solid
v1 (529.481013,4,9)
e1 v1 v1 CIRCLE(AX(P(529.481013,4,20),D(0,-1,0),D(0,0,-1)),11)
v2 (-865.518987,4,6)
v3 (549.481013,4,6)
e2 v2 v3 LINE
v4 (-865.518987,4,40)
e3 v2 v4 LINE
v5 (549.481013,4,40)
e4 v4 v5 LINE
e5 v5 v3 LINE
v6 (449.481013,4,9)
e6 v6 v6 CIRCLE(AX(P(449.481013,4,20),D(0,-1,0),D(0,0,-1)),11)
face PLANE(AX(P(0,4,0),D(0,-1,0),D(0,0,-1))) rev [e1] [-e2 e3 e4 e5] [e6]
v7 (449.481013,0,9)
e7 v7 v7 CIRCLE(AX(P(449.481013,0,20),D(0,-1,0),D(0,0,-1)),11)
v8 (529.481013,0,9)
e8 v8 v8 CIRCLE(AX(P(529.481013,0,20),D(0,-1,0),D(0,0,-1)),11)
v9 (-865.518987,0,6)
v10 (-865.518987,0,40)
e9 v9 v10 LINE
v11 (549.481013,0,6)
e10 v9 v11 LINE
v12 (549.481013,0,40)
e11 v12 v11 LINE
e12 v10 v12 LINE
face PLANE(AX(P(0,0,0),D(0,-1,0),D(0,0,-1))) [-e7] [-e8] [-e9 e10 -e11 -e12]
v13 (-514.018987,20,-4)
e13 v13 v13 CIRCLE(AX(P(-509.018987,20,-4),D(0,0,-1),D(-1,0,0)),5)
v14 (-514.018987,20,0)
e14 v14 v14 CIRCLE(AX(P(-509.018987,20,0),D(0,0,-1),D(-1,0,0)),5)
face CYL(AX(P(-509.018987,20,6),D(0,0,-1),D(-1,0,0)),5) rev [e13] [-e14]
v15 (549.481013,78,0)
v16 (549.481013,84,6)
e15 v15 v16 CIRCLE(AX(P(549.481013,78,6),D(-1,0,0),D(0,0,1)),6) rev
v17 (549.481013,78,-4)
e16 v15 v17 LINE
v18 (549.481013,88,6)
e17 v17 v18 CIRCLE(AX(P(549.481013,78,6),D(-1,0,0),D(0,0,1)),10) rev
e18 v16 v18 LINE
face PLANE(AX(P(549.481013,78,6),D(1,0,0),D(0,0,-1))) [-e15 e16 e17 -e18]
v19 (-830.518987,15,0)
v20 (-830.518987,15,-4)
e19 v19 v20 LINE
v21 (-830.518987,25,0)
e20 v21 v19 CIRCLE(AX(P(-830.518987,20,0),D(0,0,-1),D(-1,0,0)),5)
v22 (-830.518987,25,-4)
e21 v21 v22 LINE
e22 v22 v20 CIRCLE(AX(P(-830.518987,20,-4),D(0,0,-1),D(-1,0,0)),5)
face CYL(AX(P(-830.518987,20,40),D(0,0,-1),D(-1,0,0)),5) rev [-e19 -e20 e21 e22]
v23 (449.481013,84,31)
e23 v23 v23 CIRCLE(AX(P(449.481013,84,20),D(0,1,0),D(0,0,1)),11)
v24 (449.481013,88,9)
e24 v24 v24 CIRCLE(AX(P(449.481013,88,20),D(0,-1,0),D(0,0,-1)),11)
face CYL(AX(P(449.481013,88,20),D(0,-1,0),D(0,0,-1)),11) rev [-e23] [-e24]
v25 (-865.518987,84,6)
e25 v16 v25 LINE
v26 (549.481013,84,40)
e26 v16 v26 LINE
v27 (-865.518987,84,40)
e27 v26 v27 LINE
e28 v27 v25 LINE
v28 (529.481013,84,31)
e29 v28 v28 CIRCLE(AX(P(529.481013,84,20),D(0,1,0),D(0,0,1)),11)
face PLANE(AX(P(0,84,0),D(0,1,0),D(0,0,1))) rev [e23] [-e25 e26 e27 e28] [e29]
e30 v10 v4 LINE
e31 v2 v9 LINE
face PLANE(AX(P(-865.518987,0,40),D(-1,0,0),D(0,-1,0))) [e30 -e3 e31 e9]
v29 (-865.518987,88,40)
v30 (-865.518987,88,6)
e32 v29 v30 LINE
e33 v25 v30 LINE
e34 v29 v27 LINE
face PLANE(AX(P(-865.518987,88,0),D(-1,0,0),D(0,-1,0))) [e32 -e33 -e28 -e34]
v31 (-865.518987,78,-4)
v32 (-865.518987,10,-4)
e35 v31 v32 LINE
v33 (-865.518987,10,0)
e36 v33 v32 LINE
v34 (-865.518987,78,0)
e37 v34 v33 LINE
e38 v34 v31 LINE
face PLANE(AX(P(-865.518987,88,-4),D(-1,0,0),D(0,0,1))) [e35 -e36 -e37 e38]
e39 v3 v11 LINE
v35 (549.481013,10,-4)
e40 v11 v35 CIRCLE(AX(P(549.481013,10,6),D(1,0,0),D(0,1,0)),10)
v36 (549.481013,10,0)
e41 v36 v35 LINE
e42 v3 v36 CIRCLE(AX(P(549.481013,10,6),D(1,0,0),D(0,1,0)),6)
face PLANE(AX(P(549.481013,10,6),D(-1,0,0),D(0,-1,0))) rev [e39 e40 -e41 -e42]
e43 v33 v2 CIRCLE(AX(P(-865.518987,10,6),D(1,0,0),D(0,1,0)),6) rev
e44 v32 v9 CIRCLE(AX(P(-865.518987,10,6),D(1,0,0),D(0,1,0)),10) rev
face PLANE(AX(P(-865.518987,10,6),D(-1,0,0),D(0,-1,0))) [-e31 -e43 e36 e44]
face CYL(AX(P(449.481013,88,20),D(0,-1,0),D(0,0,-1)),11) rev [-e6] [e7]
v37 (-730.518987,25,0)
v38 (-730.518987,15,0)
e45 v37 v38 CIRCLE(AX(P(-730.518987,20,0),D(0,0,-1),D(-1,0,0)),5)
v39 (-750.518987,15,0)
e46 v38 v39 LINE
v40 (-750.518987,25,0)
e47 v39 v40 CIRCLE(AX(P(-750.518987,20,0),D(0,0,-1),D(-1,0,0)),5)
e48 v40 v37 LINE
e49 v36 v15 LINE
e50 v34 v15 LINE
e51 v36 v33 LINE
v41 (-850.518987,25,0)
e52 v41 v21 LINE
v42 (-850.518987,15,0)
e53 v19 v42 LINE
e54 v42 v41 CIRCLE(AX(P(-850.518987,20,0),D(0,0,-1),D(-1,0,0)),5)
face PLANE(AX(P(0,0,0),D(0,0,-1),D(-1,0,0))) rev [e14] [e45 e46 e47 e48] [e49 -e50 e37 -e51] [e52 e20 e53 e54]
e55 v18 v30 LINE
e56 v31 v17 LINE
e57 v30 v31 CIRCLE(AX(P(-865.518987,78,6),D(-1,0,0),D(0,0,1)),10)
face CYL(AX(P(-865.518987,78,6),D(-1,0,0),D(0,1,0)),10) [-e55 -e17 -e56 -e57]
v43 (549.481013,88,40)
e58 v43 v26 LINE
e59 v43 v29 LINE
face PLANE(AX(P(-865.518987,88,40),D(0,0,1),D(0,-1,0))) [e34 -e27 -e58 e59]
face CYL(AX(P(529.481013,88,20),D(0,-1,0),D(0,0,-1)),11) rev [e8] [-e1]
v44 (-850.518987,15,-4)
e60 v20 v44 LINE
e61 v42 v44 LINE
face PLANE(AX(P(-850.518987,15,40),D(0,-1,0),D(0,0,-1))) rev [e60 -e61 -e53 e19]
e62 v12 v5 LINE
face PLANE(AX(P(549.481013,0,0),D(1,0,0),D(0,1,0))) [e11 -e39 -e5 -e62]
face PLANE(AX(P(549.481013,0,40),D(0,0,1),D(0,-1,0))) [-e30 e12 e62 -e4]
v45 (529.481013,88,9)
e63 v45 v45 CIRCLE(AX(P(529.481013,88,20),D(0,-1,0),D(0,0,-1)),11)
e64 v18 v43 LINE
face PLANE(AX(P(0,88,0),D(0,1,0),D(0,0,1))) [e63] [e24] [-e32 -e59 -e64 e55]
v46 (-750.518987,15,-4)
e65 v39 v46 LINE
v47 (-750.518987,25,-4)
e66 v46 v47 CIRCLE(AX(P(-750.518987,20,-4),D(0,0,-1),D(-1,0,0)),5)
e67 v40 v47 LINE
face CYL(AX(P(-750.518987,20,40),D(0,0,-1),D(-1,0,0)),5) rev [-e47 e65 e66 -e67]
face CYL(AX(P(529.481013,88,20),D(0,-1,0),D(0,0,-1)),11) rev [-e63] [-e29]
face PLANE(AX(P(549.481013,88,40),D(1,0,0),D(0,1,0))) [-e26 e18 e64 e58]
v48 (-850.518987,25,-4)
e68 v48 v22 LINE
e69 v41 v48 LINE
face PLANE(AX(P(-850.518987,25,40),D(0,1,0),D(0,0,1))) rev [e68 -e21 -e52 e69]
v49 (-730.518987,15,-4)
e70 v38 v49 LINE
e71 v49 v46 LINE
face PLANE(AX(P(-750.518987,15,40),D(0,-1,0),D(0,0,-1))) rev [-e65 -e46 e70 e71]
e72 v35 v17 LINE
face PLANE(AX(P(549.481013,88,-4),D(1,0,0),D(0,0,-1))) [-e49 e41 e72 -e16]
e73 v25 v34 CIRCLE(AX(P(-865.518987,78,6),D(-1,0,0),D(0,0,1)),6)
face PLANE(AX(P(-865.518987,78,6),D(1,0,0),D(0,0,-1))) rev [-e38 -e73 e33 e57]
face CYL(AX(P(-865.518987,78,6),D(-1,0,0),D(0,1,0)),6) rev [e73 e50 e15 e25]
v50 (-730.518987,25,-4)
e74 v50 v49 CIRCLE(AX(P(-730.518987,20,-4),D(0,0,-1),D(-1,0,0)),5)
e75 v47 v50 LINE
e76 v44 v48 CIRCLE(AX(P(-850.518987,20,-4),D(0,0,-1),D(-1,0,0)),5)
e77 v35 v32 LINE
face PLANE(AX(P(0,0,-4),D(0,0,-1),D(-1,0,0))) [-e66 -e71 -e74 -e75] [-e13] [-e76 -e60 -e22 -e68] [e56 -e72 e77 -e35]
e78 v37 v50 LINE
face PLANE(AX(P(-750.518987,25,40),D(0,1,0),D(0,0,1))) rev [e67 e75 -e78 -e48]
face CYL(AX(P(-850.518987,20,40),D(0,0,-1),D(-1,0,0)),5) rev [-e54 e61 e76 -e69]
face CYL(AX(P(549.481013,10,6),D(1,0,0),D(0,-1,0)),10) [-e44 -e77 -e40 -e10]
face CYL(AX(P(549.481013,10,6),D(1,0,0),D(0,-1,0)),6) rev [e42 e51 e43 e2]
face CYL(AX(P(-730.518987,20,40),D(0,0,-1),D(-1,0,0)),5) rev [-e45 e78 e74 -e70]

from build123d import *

# Parameters (mm, degrees)
SKETCH1_W                    = 1415
SKETCH1_H                    = 88
BASE_FLANGE1_DEPTH           = 4
EDGE_FLANGE1_STRIP_W         = 28
EDGE_FLANGE1_STRIP_H         = 4
EDGE_FLANGE1_STRIP_CUT_DEPTH = 1415
EDGE_FLANGE1_DEPTH           = 1415
EDGE_FLANGE2_STRIP_W         = 28
EDGE_FLANGE2_STRIP_H         = 4
EDGE_FLANGE2_STRIP_CUT_DEPTH = 1415
EDGE_FLANGE2_DEPTH           = 1415
CUT_EXTRUDE1_DEPTH           = 871.900176512
CUT_EXTRUDE1_DEPTH_BACK      = 871.900176512
SKETCH12_R                   = 11
CUT_EXTRUDE2_DEPTH           = 872.093059006
SKETCH16_R                   = 5
CUT_EXTRUDE4_DEPTH           = 10


# Sheet-metal steps are written as plain solids
with BuildPart() as part:
    # Sketch1 → Base-Flange1 (new body)
    with BuildSketch(Plane.XY):
        with Locations((-158.018987342, 44)):
            Rectangle(SKETCH1_W, SKETCH1_H)
    extrude(amount=-BASE_FLANGE1_DEPTH)

    # Edge-Flange1 strip (across the edge) → Edge-Flange1 strip cut (cut)
    with BuildSketch(Plane(origin=(549.481012658, 88, 0), x_dir=(0, -1, 0), z_dir=(-1, 0, 0))):
        with Locations((-4, -2)):
            Rectangle(EDGE_FLANGE1_STRIP_W, EDGE_FLANGE1_STRIP_H)
    extrude(amount=EDGE_FLANGE1_STRIP_CUT_DEPTH, mode=Mode.SUBTRACT)

    # Edge-Flange1 section (across the edge) → Edge-Flange1 (add)
    with BuildSketch(Plane(origin=(549.481012658, 88, 0), x_dir=(0, -1, 0), z_dir=(-1, 0, 0))):
        with BuildLine():
            Line((0, 6), (0, 40))
            Line((0, 40), (4, 40))
            Line((4, 40), (4, 6))
            ThreePointArc((4, 6), (5.757359313, 1.757359313), (10, 0))
            Line((10, 0), (10, -4))
            ThreePointArc((10, -4), (2.928932188, -1.071067812), (0, 6))
        make_face()
    extrude(amount=EDGE_FLANGE1_DEPTH)

    # Edge-Flange2 strip (across the edge) → Edge-Flange2 strip cut (cut)
    with BuildSketch(Plane.YZ.offset(-865.518987342)):
        with Locations((-4, -2)):
            Rectangle(EDGE_FLANGE2_STRIP_W, EDGE_FLANGE2_STRIP_H)
    extrude(amount=EDGE_FLANGE2_STRIP_CUT_DEPTH, mode=Mode.SUBTRACT)

    # Edge-Flange2 section (across the edge) → Edge-Flange2 (add)
    with BuildSketch(Plane.YZ.offset(-865.518987342)):
        with BuildLine():
            Line((0, 6), (0, 40))
            Line((0, 40), (4, 40))
            Line((4, 40), (4, 6))
            ThreePointArc((4, 6), (5.757359313, 1.757359313), (10, 0))
            Line((10, 0), (10, -4))
            ThreePointArc((10, -4), (2.928932188, -1.071067812), (0, 6))
        make_face()
    extrude(amount=EDGE_FLANGE2_DEPTH)

    # Sketch12 → Cut-Extrude1 (cut, two sides: drawn at the far end of the back side and taken through both)
    with BuildSketch(Plane.XZ.offset(-CUT_EXTRUDE1_DEPTH_BACK)):
        with Locations(Location((529.481012658, 20, 0), (0, 0, 270))):
            Circle(SKETCH12_R)
        with Locations(Location((449.481012658, 20, 0), (0, 0, 270))):
            Circle(SKETCH12_R)
    extrude(amount=CUT_EXTRUDE1_DEPTH + CUT_EXTRUDE1_DEPTH_BACK, mode=Mode.SUBTRACT)

    # Sketch13 → Cut-Extrude2 (cut, through all)
    with BuildSketch(Plane(origin=(0, 0, -4), x_dir=(-1, 0, 0), z_dir=(0, 0, -1))):
        with BuildLine():
            Line((850.518987342, 15), (830.518987342, 15))
            ThreePointArc((830.518987342, 15), (825.518987342, 20), (830.518987342, 25))
            Line((830.518987342, 25), (850.518987342, 25))
            ThreePointArc((850.518987342, 25), (855.518987342, 20), (850.518987342, 15))
        make_face()
        with BuildLine():
            Line((750.518987342, 15), (730.518987342, 15))
            ThreePointArc((730.518987342, 15), (725.518987342, 20), (730.518987342, 25))
            Line((730.518987342, 25), (750.518987342, 25))
            ThreePointArc((750.518987342, 25), (755.518987342, 20), (750.518987342, 15))
        make_face()
    extrude(amount=-CUT_EXTRUDE2_DEPTH, mode=Mode.SUBTRACT)

    # Sketch16 → Cut-Extrude4 (cut)
    with BuildSketch(Plane(origin=(0, 0, -4), x_dir=(-1, 0, 0), z_dir=(0, 0, -1))):
        with Locations((509.018987342, 20)):
            Circle(SKETCH16_R)
    extrude(amount=-CUT_EXTRUDE4_DEPTH, mode=Mode.SUBTRACT)


solid = part.part
